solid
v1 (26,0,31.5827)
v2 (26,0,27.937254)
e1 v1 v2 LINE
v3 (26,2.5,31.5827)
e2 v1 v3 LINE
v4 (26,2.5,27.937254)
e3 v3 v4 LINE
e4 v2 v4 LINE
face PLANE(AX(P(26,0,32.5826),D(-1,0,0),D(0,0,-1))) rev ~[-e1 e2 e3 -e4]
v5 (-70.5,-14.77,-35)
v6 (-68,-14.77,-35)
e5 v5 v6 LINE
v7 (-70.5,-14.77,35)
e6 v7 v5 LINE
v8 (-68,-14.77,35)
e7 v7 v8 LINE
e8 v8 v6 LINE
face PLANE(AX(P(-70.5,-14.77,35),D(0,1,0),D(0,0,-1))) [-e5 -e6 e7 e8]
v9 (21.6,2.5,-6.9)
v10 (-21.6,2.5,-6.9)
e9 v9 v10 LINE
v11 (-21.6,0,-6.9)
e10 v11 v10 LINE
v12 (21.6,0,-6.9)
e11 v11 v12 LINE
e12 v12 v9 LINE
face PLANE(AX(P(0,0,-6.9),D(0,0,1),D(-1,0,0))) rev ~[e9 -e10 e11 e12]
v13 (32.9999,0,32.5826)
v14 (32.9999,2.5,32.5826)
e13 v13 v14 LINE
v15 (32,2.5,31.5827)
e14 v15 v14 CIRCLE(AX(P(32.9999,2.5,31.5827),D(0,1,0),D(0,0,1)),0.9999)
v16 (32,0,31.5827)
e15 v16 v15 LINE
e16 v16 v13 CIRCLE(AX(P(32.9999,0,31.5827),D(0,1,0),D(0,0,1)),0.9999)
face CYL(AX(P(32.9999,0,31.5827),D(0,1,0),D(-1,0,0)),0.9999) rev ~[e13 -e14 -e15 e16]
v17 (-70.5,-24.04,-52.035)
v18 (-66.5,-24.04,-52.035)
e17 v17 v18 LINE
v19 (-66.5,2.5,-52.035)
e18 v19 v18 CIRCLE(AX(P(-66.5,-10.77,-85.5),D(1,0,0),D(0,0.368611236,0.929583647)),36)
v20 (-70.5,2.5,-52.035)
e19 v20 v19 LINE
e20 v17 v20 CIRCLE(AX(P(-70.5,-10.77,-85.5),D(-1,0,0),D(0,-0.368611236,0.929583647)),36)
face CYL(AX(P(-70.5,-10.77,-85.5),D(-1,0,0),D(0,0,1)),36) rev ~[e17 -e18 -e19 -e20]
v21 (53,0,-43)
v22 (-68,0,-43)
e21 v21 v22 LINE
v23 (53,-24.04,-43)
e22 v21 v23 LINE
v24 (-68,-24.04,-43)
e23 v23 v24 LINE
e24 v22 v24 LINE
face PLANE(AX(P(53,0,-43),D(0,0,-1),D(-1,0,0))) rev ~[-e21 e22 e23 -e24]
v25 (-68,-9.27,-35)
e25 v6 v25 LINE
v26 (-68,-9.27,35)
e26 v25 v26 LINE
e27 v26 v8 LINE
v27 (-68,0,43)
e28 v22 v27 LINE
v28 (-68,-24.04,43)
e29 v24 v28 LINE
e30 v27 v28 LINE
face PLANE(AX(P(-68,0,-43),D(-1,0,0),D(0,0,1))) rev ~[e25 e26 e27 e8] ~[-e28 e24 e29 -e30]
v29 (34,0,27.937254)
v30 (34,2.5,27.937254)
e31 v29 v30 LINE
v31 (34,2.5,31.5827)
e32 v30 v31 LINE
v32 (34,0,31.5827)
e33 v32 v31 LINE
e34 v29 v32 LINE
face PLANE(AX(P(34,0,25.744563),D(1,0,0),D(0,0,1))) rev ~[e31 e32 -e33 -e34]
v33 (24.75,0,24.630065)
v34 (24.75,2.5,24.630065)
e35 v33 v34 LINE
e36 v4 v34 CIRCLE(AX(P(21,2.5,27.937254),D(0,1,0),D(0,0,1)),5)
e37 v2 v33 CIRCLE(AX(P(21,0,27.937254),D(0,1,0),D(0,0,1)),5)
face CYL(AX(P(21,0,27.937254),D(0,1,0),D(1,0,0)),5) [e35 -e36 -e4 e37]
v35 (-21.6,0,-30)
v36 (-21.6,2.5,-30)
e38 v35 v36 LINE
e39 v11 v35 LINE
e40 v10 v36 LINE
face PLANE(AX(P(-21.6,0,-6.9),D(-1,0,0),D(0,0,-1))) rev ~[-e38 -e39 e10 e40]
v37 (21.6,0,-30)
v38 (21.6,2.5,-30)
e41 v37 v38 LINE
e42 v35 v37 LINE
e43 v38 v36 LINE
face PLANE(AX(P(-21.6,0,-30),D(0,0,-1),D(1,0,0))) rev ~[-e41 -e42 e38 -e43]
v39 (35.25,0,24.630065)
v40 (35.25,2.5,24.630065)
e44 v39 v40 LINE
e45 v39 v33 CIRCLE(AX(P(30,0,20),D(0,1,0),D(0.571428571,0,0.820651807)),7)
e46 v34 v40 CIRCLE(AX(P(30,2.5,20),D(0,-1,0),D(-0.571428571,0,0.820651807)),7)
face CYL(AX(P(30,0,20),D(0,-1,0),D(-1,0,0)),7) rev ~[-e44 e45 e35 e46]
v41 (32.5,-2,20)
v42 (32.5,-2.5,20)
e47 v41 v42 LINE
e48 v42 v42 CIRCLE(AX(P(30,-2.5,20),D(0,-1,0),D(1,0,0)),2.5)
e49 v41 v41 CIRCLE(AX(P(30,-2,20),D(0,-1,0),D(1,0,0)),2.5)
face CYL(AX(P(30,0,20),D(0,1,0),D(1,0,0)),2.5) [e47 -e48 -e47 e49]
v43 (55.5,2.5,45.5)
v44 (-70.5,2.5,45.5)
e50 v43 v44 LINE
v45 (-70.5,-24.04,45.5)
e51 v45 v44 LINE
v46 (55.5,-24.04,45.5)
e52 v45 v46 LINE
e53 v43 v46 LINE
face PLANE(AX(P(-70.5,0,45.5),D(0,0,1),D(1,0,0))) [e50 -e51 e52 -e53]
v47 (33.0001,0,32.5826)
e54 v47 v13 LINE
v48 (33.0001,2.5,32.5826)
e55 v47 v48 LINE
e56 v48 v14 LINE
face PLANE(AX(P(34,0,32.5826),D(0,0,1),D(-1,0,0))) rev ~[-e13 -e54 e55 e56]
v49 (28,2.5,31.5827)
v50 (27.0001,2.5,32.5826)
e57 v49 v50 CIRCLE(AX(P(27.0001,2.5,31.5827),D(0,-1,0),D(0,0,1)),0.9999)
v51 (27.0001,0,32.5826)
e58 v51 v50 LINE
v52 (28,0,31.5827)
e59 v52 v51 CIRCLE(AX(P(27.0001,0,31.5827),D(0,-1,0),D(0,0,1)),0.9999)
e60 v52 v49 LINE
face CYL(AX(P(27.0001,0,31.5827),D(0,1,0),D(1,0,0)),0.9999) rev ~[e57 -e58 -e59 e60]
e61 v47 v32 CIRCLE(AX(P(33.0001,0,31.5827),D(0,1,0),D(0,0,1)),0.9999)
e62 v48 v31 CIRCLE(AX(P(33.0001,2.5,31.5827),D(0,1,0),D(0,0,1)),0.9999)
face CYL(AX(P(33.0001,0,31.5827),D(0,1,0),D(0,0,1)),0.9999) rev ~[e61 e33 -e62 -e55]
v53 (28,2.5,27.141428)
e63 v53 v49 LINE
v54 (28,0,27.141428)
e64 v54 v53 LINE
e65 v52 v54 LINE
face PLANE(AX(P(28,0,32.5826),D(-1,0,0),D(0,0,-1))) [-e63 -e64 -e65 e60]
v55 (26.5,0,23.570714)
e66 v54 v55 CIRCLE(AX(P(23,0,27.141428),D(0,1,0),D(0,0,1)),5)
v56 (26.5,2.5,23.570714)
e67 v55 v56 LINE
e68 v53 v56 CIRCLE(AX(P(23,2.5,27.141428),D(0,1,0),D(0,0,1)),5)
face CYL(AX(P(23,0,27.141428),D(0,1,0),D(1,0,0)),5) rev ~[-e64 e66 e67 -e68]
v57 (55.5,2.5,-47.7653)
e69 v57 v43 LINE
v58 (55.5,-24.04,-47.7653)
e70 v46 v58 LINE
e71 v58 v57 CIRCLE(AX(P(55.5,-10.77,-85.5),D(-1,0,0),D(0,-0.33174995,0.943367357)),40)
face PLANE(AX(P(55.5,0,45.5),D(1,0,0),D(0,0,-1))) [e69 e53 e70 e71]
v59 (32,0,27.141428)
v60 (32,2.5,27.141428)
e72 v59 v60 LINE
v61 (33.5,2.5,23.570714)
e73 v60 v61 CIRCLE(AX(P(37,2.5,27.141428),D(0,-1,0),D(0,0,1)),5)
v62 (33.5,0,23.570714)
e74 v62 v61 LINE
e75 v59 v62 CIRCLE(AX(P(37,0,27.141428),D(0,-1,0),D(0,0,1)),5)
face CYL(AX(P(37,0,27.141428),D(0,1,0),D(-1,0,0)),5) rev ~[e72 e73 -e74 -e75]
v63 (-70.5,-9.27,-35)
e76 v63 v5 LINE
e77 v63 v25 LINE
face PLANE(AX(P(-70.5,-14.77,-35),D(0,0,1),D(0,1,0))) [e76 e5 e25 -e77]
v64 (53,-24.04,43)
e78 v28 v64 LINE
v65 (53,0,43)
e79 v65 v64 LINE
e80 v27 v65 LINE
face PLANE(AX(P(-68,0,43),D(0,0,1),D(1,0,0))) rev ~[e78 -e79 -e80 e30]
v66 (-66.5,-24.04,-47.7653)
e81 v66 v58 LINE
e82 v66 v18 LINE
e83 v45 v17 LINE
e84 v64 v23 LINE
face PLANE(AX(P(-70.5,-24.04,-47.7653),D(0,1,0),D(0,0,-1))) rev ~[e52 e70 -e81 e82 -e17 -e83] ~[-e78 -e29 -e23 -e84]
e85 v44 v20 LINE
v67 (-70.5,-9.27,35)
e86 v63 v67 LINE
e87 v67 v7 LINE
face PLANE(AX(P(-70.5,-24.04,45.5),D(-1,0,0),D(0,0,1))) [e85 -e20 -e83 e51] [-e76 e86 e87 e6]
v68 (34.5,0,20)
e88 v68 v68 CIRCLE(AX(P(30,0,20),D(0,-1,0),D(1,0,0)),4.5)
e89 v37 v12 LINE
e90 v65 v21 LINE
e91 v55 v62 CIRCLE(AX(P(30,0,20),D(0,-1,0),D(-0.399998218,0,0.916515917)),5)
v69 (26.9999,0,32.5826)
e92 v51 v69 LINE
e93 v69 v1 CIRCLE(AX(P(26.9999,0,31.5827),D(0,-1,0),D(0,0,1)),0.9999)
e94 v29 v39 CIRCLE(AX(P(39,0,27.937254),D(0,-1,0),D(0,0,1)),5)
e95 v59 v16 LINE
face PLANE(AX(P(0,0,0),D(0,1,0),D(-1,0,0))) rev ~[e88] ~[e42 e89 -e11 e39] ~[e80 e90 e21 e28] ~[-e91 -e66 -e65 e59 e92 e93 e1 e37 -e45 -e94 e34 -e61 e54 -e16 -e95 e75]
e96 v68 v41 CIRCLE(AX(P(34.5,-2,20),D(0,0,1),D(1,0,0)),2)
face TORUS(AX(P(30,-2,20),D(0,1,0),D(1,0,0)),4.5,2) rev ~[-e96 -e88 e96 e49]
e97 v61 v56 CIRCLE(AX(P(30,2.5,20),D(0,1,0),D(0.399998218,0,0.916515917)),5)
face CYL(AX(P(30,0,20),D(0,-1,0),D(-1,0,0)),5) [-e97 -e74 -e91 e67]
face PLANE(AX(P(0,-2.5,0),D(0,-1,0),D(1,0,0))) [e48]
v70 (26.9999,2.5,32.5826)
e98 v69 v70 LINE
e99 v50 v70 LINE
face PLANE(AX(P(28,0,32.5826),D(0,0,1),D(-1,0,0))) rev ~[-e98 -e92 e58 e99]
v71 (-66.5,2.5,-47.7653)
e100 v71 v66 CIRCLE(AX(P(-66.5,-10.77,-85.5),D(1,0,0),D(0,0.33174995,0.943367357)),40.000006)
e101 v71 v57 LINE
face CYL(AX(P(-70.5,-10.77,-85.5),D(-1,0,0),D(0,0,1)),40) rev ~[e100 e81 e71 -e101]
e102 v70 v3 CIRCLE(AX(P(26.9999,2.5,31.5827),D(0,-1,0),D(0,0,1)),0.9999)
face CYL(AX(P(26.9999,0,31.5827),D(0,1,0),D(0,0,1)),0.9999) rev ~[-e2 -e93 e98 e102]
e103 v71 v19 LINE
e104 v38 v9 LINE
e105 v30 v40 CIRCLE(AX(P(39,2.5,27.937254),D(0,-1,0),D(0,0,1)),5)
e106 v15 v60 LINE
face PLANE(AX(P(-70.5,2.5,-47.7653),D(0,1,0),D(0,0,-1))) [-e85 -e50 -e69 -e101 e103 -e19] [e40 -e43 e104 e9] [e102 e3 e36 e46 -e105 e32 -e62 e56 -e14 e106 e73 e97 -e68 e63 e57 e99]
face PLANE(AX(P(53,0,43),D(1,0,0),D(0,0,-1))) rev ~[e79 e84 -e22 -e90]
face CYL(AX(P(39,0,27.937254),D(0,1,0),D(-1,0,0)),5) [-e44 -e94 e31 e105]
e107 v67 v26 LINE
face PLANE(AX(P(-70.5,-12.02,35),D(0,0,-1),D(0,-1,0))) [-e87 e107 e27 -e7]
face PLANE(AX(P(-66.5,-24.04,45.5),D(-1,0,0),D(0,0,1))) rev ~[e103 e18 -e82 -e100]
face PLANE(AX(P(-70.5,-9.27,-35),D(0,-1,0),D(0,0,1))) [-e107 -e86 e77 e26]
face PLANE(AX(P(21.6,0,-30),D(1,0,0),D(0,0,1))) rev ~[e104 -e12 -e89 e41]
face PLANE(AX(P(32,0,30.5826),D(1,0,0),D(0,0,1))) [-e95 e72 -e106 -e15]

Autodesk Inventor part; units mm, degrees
ref_plane "YZ Plane" through (0, 0, 0) normal (1, 0, 0) x (0, 1, 0)
ref_plane "XZ Plane" through (0, 0, 0) normal (0, 1, 0) x (-1, 0, 0)
ref_plane "XY Plane" through (0, 0, 0) normal (0, 0, 1) x (1, 0, 0)
sketch "Эскиз1" plane through (0, 0, 0) normal (0, 1, 0) x (-1, 0, 0)
  line L0 (50, -40) -> (-50, -40)
  line L1 (-50, -40) -> (-50, 40)
  line L2 (-50, 40) -> (50, 40)
  line L3 (50, 40) -> (50, -40)
  line L4 (50, -40) -> (-50, 40) construction
  line L5 (-50, -40) -> (50, 40) construction
  line L6 (21.6, -30) -> (-21.6, -30)
  line L7 (-21.6, -30) -> (-21.6, -6.9)
  line L8 (-21.6, -6.9) -> (21.6, -6.9)
  line L9 (21.6, -6.9) -> (21.6, -30)
  line L10 (-53, -43) -> (53, -43)
  line L11 (53, -43) -> (53, 43)
  line L12 (53, 43) -> (-53, 43)
  line L13 (-53, 43) -> (-53, -43)
  line L14 (53, 43) -> (68, 43)
  line L15 (68, 43) -> (68, -43)
  line L16 (68, -43) -> (53, -43)
  line L17 (53, -43) -> (53, 43)
  line L18 (-53, -43) -> (68, -43)
  line L19 (68, -43) -> (68, 43)
  line L20 (68, 43) -> (-53, 43)
  line L21 (-53, 43) -> (-53, -43)
  line L22 (0, -40) -> (0, 40)
  circle A0 centre (-30, 20) radius 5
  circle A1 centre (-30, 20) radius 7
  line L23 (-30, 20) -> (-30, 40)
  line L24 (-28, 30.5826) -> (-32, 30.5826)
  line L25 (-32, 30.5826) -> (-32, 24.5826)
  line L26 (-32, 24.5826) -> (-28, 24.5826)
  line L27 (-28, 24.5826) -> (-28, 30.5826)
  line L28 (-28, 30.5826) -> (-32, 24.5826) construction
  line L29 (-32, 30.5826) -> (-28, 24.5826) construction
  line L30 (-34, 22.5826) -> (-34, 32.5826)
  line L31 (-34, 32.5826) -> (-26, 32.5826)
  line L32 (-26, 32.5826) -> (-26, 22.5826)
  line L33 (-26, 22.5826) -> (-34, 22.5826)
  line L34 (-28, 30.5826) -> (-32, 30.5826)
  line L35 (-32, 30.5826) -> (-32, 32.5826)
  line L36 (-32, 32.5826) -> (-28, 32.5826)
  line L37 (-28, 32.5826) -> (-28, 30.5826)
  line L38 (-55.5, -45.5) -> (70.5, -45.5)
  line L39 (70.5, -45.5) -> (70.5, 45.5)
  line L40 (-55.5, -45.5) -> (-55.5, 45.5)
  line L41 (-55.5, 45.5) -> (70.5, 45.5)
  point P0 (0, 0)
  point P1 (0, -30)
  point P2 (-30, 27.5826)
  point P3 (53, -43)
  point P4 (-26, 25.7446)
  point P5 (-34, 25.7446)
  point P6 (53, -43)
  dimension "d7" = 10
  dimension "d0" = 100
  dimension "d1" = 80
  dimension "d2" = 43.2
  dimension "d3" = 23.1
  dimension "d4" = 3
  dimension "d5" = 15
  dimension "d6" = 10
  dimension "d8" = 2
  dimension "d9" = 20
  dimension "d10" = 20
  dimension "d11" = 4
  dimension "d12" = 6
  dimension "d13" = 2
  dimension "d22" = 2.5
  dimension "d23" = 2.5
extrude "Выдавливание1" add sketch "Эскиз1" along normal blind 2.5 contours L0 L22 L6 L9 L8 L2 L3 | L0 L1 L2 L22 L8 L7 L6 | L13 L12 L11 L10 | L11 L14 L15 L16 | A0 L30 L33 L32 | L32 L33 L23 L26 A0 | A0 L26 L23 L33 L30 | L26 L23 A0 | A0 L23 A1 L27 | L25 A1 L23 A0 | A0 L23 L26 | A1 L23 L24 L27 | L25 L24 L23 A1 | L24 L23 L31 L37 | L35 L31 L23 L24 | L40 L41 L39 L38
fillet "Сопряжение1" radius 5 4 edges at (26, 1.25, 25.7446) (28, 1.25, 24.5826) (32, 1.25, 24.5826) (34, 1.25, 25.7446)
fillet "Сопряжение2" radius 1 4 edges at (26, 1.25, 32.5826) (28, 1.25, 32.5826) (32, 1.25, 32.5826) (34, 1.25, 32.5826)
sketch "Эскиз2" plane through (0, 0, 0) normal (0, -1, 0) x (1, 0, 0)
  line L0 (-21.6, -30) -> (21.6, -30) projected
  line L1 (-21.6, -6.9) -> (-21.6, -30) projected
  line L2 (21.6, -6.9) -> (-21.6, -6.9) projected
  line L3 (21.6, -30) -> (21.6, -6.9) projected
  arc A0 (34, 27.9373) -> (35.25, 24.6301) centre (39, 27.9373) ccw projected
  arc A1 (24.75, 24.6301) -> (35.25, 24.6301) centre (30, 20) ccw projected
  arc A2 (24.75, 24.6301) -> (26, 27.9373) centre (21, 27.9373) ccw projected
  line L4 (26, 31.5826) -> (26, 27.9373) projected
  arc A3 (28, 31.5826) -> (26, 31.5826) centre (27, 31.5826) ccw projected
  line L5 (28, 27.1414) -> (28, 31.5826) projected
  arc A4 (26.5, 23.5707) -> (28, 27.1414) centre (23, 27.1414) ccw projected
  arc A5 (26.5, 23.5707) -> (33.5, 23.5707) centre (30, 20) ccw projected
  arc A6 (32, 27.1414) -> (33.5, 23.5707) centre (37, 27.1414) ccw projected
  line L6 (32, 31.5826) -> (32, 27.1414) projected
  arc A7 (34, 31.5826) -> (32, 31.5826) centre (33, 31.5826) ccw projected
  line L7 (34, 27.9373) -> (34, 31.5826) projected
  circle A8 centre (30, 20) radius 2.5
  point P0 (0, 0)
  dimension "d18" = 5
extrude "Выдавливание2" add sketch "Эскиз2" along normal blind 2.5 contours A8
fillet "Сопряжение3" radius 2 1 edges at (27.5, 0, 20)
sketch "Эскиз3" plane through (0, 0, 0) normal (0, -1, 0) x (1, 0, 0)
  arc A0 (34, 27.9373) -> (35.25, 24.6301) centre (39, 27.9373) ccw projected
  arc A1 (24.75, 24.6301) -> (35.25, 24.6301) centre (30, 20) ccw projected
  arc A2 (24.75, 24.6301) -> (26, 27.9373) centre (21, 27.9373) ccw projected
  line L0 (26, 31.5826) -> (26, 27.9373) projected
  arc A3 (28, 31.5826) -> (26, 31.5826) centre (27, 31.5826) ccw projected
  line L1 (28, 27.1414) -> (28, 31.5826) projected
  arc A4 (26.5, 23.5707) -> (28, 27.1414) centre (23, 27.1414) ccw projected
  arc A5 (26.5, 23.5707) -> (33.5, 23.5707) centre (30, 20) ccw projected
  arc A6 (32, 27.1414) -> (33.5, 23.5707) centre (37, 27.1414) ccw projected
  line L2 (32, 31.5826) -> (32, 27.1414) projected
  arc A7 (34, 31.5826) -> (32, 31.5826) centre (33, 31.5826) ccw projected
  line L3 (34, 27.9373) -> (34, 31.5826) projected
  line L4 (-21.6, -30) -> (21.6, -30) projected
  line L5 (-21.6, -6.9) -> (-21.6, -30) projected
  line L6 (21.6, -6.9) -> (-21.6, -6.9) projected
  line L7 (21.6, -30) -> (21.6, -6.9) projected
  circle A8 centre (30, 20) radius 4.5 projected
  line L8 (55.5, -45.5) -> (-70.5, -45.5) projected
  line L9 (55.5, 45.5) -> (55.5, -45.5) projected
  line L10 (-70.5, 45.5) -> (55.5, 45.5) projected
  line L11 (-70.5, -45.5) -> (-70.5, 45.5) projected
  arc A9 (34, 27.9373) -> (35.25, 24.6301) centre (39, 27.9373) ccw projected
  arc A10 (24.75, 24.6301) -> (35.25, 24.6301) centre (30, 20) ccw projected
  arc A11 (24.75, 24.6301) -> (26, 27.9373) centre (21, 27.9373) ccw projected
  line L12 (26, 31.5826) -> (26, 27.9373) projected
  arc A12 (28, 31.5826) -> (26, 31.5826) centre (27, 31.5826) ccw projected
  line L13 (28, 27.1414) -> (28, 31.5826) projected
  arc A13 (26.5, 23.5707) -> (28, 27.1414) centre (23, 27.1414) ccw projected
  arc A14 (26.5, 23.5707) -> (33.5, 23.5707) centre (30, 20) ccw projected
  arc A15 (32, 27.1414) -> (33.5, 23.5707) centre (37, 27.1414) ccw projected
  line L14 (32, 31.5826) -> (32, 27.1414) projected
  arc A16 (34, 31.5826) -> (32, 31.5826) centre (33, 31.5826) ccw projected
  line L15 (34, 27.9373) -> (34, 31.5826) projected
  line L16 (-21.6, -30) -> (21.6, -30) projected
  line L17 (-21.6, -6.9) -> (-21.6, -30) projected
  line L18 (21.6, -6.9) -> (-21.6, -6.9) projected
  line L19 (21.6, -30) -> (21.6, -6.9) projected
  circle A17 centre (30, 20) radius 4.5 projected
  line L20 (53, 43) -> (53, -43)
  line L21 (53, -43) -> (-68, -43)
  line L22 (-68, -43) -> (-68, 43)
  line L23 (-68, 43) -> (53, 43)
  dimension "d28" = 2.5
extrude "Выдавливание3" add sketch "Эскиз3" along normal blind 24.04 contours L8 L11 L10 L9
sketch "Эскиз4" plane through (-70.5, 2.5, -45.5) normal (-1, 0, 0) x (0, 0, 1)
  line L0 (91, -26.54) -> (91, 0) projected
  line L1 (0, 0) -> (91, 0) projected
  line L2 (0, -26.54) -> (0, 0) projected
  line L3 (91, -26.54) -> (0, -26.54) projected
  line L4 (0, 0) -> (0, -26.54) projected
  line L5 (0, -13.27) -> (-40, -13.27)
  circle A0 centre (-40, -13.27) radius 40
  line L6 (0, -26.54) -> (0, 0) projected
  line L7 (0, -26.54) -> (-2.2653, -26.54)
  line L8 (-2.2653, -26.54) -> (-2.2653, 0)
  line L9 (-2.2653, 0) -> (0, 0)
  line L10 (0, 0) -> (0, -26.54)
  line L11 (0, 0) -> (91, 0) projected
  point P0 (45.5, -2.5)
  point P1 (-2.2653, -26.54)
  dimension "d29" = 80
extrude "Выдавливание4" add sketch "Эскиз4" against normal up to surface (126 mm away) contours L7 A0 L2 | L2 A0 L9
sketch "Эскиз5" plane through (-70.5, -24.04, 45.5) normal (-1, 0, 0) x (0, 0, 1)
  line L0 (0, 0) -> (0, 26.54) projected
  line L1 (0, 26.54) -> (-93.2653, 26.54) projected
  arc A0 (-93.2653, 0) -> (-93.2653, 26.54) centre (-131, 13.27) ccw projected
  line L2 (0, 0) -> (-93.2653, 0) projected
  circle A1 centre (-131, 13.27) radius 40
  circle A2 centre (-131, 13.27) radius 36
  line L3 (-93.2653, 0) -> (-97.535, 0)
  arc A3 (-93.2653, 0) -> (-93.2653, 26.54) centre (-131, 13.27) ccw projected
  line L4 (-93.2653, 26.54) -> (-97.535, 26.54)
  point P0 (-45.5, 24.04)
  dimension "d32" = 4
extrude "Выдавливание5" add sketch "Эскиз5" against normal blind 4 contours L3 A2 L4 A0
sketch "Эскиз6" plane through (-70.5, -24.04, 45.5) normal (-1, 0, 0) x (0, 0, 1)
  line L0 (-2.5, 24.04) -> (-88.5, 24.04) projected
  line L1 (-2.5, 24.04) -> (-2.5, 0) projected
  line L2 (-88.5, 0) -> (-2.5, 0) projected
  line L3 (-88.5, 24.04) -> (-88.5, 0) projected
  line L4 (-88.5, 24.04) -> (-88.5, 0) projected
  line L5 (-88.5, 12.02) -> (-2.5, 12.02)
  line L6 (-2.5, 24.04) -> (-2.5, 0) projected
  line L7 (-10.5, 9.27) -> (-80.5, 9.27)
  line L8 (-80.5, 9.27) -> (-80.5, 14.77)
  line L9 (-80.5, 14.77) -> (-10.5, 14.77)
  line L10 (-10.5, 14.77) -> (-10.5, 9.27)
  line L11 (-10.5, 9.27) -> (-80.5, 14.77) construction
  line L12 (-80.5, 9.27) -> (-10.5, 14.77) construction
  point P0 (-45.5, 24.04)
  point P1 (-45.5, 12.02)
  dimension "d35" = 70
  dimension "d36" = 5.5
extrude "Выдавливание6" cut sketch "Эскиз6" against normal blind 4 contours L10 L7 L8 L5 | L5 L8 L9 L10
properties part number "tacho_base"
